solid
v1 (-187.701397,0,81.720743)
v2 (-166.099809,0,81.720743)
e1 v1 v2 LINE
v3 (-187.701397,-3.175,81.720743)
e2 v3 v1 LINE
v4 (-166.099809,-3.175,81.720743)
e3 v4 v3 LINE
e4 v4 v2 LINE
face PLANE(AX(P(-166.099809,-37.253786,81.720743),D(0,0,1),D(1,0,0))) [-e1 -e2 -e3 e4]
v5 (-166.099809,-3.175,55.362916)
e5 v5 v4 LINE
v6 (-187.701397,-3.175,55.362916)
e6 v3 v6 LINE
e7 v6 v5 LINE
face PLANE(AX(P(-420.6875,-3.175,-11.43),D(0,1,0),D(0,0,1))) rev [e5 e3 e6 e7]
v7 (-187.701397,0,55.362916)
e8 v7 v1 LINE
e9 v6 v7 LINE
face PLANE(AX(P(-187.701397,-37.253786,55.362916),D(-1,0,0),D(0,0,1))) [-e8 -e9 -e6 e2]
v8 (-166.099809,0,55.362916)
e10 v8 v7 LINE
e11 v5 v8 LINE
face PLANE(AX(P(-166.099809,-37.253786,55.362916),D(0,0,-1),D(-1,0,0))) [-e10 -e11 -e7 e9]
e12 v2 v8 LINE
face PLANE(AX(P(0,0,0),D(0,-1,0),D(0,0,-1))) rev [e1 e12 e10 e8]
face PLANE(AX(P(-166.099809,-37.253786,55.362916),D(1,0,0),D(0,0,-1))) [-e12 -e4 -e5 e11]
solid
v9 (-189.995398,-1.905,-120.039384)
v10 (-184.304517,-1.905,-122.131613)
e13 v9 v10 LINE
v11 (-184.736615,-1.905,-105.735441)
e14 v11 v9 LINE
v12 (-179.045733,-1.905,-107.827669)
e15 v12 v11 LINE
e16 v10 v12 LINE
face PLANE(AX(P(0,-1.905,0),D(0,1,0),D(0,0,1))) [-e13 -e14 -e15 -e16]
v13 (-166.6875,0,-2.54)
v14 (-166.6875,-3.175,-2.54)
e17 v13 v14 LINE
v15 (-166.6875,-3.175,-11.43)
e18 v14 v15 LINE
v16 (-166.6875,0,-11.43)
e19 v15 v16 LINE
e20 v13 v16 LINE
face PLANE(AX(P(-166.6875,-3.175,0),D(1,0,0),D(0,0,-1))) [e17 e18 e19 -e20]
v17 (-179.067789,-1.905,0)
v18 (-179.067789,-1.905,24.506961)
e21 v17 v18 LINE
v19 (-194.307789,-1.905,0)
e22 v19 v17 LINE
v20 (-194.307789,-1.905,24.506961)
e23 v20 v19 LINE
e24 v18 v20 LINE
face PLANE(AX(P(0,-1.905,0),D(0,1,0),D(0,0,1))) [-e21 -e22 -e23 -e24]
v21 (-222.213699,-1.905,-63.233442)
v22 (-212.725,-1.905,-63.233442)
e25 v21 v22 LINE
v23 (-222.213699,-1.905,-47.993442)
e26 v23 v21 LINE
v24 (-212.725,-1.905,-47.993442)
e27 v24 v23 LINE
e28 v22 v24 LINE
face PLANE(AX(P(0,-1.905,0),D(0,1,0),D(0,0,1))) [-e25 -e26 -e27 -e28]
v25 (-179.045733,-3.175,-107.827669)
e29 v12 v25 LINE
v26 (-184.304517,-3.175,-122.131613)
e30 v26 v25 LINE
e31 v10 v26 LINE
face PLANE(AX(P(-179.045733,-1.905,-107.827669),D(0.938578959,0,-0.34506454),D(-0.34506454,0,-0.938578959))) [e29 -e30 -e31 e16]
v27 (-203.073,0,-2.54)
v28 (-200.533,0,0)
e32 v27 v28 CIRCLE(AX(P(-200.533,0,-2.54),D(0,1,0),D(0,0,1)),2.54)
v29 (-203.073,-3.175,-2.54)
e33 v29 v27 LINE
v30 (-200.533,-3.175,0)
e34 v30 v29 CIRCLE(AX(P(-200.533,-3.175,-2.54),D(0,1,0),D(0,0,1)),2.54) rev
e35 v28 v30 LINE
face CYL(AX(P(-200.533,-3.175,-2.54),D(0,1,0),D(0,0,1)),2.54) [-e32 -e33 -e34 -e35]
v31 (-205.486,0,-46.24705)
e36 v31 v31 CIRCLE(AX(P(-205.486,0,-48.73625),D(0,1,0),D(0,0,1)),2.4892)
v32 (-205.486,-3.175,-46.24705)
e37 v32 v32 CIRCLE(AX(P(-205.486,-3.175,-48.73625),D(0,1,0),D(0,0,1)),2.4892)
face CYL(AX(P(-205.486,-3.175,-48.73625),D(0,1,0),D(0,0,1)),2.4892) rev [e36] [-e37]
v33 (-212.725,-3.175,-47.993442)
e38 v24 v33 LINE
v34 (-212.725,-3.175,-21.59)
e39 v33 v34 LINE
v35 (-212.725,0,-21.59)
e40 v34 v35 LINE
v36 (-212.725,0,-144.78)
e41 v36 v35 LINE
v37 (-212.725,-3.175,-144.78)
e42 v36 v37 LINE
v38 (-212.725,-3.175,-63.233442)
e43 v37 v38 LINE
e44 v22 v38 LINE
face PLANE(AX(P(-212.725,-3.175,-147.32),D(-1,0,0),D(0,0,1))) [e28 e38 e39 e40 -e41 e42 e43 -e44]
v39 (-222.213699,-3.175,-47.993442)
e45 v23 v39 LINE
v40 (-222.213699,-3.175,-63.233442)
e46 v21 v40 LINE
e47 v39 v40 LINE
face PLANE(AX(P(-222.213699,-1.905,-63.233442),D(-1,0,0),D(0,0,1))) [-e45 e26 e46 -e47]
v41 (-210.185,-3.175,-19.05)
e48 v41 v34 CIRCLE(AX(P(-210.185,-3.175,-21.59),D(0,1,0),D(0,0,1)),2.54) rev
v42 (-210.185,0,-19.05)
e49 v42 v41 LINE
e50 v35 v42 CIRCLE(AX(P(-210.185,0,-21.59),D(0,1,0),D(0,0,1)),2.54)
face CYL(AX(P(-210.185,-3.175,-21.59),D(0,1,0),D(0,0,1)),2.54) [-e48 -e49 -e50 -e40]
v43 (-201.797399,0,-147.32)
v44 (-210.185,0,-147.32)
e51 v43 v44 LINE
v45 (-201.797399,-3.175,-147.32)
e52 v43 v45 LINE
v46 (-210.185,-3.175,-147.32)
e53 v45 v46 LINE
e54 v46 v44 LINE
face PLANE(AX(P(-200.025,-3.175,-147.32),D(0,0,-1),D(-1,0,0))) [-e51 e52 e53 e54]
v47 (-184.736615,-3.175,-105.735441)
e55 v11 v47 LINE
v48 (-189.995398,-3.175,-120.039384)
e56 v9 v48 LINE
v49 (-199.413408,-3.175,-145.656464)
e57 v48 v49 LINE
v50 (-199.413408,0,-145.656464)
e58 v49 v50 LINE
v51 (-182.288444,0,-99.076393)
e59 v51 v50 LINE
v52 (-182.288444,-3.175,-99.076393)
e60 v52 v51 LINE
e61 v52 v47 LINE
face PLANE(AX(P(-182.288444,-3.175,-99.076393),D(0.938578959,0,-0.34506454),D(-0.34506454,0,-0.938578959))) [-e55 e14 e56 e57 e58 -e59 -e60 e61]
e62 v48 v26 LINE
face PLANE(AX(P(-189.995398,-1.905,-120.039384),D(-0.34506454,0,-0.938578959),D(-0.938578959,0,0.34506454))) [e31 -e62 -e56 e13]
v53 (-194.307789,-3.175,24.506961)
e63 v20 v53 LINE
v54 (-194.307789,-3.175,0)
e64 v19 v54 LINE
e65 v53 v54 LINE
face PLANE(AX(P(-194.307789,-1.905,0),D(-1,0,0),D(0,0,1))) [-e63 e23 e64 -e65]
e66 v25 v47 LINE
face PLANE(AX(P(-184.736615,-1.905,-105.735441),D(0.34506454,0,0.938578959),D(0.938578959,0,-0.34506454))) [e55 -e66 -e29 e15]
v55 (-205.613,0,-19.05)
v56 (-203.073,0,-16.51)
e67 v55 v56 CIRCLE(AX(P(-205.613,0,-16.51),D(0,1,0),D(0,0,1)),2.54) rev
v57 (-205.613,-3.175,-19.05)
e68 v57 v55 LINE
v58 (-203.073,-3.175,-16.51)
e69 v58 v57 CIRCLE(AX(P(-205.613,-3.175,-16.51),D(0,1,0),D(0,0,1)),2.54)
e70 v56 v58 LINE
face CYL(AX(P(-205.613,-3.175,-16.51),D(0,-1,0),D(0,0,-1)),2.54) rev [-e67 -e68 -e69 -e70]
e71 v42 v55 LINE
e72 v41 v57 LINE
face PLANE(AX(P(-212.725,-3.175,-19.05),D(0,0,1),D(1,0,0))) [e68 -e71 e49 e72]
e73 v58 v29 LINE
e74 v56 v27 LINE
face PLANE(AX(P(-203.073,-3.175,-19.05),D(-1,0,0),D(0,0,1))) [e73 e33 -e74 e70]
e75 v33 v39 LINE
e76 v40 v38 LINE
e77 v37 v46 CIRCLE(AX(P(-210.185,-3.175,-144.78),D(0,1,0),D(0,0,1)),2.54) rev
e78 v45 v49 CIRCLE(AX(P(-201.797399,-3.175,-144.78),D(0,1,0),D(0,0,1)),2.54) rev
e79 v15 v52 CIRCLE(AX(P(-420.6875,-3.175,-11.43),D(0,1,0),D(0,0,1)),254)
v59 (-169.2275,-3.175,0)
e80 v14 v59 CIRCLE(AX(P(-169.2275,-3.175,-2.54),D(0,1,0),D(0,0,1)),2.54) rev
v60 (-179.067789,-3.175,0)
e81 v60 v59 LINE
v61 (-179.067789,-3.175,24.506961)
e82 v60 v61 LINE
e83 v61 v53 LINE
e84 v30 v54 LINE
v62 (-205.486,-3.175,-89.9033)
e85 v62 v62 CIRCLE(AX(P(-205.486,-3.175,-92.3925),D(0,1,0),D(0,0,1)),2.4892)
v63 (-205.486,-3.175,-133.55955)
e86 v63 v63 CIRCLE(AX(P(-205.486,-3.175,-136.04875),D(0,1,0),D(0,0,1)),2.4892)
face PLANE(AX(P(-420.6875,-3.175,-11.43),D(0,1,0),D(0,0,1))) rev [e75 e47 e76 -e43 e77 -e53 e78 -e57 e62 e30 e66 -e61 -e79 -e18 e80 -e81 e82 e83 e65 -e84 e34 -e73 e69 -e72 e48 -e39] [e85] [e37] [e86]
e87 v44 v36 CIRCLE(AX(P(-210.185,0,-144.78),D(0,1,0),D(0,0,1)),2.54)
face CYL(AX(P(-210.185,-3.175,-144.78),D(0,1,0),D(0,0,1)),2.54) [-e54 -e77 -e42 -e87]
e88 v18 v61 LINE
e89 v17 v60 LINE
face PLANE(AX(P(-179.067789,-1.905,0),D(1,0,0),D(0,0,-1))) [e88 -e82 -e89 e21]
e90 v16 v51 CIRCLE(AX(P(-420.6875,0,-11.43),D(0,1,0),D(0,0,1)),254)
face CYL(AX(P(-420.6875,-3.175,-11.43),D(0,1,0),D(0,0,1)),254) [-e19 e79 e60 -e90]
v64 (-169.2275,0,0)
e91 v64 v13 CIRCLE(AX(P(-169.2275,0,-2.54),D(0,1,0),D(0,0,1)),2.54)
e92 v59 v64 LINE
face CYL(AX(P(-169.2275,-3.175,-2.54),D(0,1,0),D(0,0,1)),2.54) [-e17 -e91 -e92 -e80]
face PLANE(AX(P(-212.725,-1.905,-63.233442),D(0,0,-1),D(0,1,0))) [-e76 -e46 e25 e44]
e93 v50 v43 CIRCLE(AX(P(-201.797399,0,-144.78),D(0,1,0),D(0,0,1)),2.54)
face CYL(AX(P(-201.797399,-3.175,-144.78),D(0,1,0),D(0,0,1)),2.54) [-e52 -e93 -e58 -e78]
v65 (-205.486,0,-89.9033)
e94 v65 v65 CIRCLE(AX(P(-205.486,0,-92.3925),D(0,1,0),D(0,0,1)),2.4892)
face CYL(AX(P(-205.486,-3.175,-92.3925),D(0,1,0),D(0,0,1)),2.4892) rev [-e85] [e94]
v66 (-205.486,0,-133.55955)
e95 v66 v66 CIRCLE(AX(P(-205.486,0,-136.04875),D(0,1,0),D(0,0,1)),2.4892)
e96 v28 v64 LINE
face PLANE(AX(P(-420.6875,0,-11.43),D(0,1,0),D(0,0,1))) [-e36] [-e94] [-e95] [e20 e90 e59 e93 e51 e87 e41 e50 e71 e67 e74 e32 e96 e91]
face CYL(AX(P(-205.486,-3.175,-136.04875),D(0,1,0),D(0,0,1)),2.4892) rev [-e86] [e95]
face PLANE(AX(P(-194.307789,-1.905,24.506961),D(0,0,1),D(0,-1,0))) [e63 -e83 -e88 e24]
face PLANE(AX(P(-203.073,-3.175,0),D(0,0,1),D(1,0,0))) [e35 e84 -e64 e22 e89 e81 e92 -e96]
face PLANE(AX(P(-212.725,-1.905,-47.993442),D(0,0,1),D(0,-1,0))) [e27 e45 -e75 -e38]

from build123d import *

# Parameters (mm, degrees)
BASE_FLANGE1_DEPTH  = 3.175
FILLET1_R           = 2.54
SKETCH9_R           = 2.4892
CUT_EXTRUDE1_DEPTH  = 259.776329385
SKETCH10_W          = 21.601588443
SKETCH10_H          = 26.357827305
BOSS_EXTRUDE1_DEPTH = 3.175
SKETCH11_W          = 15.24
SKETCH11_H          = 24.506960717
SKETCH11_W_2        = 9.488699203
SKETCH11_H_2        = 15.24
BOSS_EXTRUDE2_DEPTH = 1.27


# Sheet-metal steps are written as plain solids
with BuildPart() as part:
    # Sketch1 → Base-Flange1 (new body)
    with BuildSketch(Plane(origin=(0, 0, 0), x_dir=(1, 0, 0), z_dir=(0, 1, 0))):
        with BuildLine():
            Line((-203.073, 0), (-166.6875, 0))
            Line((-166.6875, 0), (-166.6875, 11.43))
            ThreePointArc((-166.6875, 11.43), (-170.61814947, 55.942020012), (-182.288444296, 99.07639319))
            Line((-182.288444296, 99.07639319), (-200.025, 147.32))
            Line((-200.025, 147.32), (-212.725, 147.32))
            Line((-212.725, 147.32), (-212.725, 19.05))
            Line((-212.725, 19.05), (-203.073, 19.05))
            Line((-203.073, 19.05), (-203.073, 0))
        make_face()
    extrude(amount=-BASE_FLANGE1_DEPTH)

    # Fillet1
    fillet1_edges = [part.edges().sort_by_distance(p)[0] for p in [
        (-166.6875, -1.5875, 0),
        (-203.073, -1.5875, 0),
        (-203.073, -1.5875, -19.05),
        (-212.725, -1.5875, -19.05),
        (-212.725, -1.5875, -147.32),
        (-200.025, -1.5875, -147.32),
    ]]
    fillet(fillet1_edges, radius=FILLET1_R)

    # Sketch9 → Cut-Extrude1 (cut, through all)
    with BuildSketch(Plane(origin=(0, 0, 0), x_dir=(1, 0, 0), z_dir=(0, 1, 0))):
        with Locations(Location((-205.486, 48.73625, 0), (0, 0, 270))):
            Circle(SKETCH9_R)
        with Locations(Location((-205.486, 92.3925, 0), (0, 0, 270))):
            Circle(SKETCH9_R)
        with Locations(Location((-205.486, 136.04875, 0), (0, 0, 270))):
            Circle(SKETCH9_R)
    extrude(amount=-CUT_EXTRUDE1_DEPTH, mode=Mode.SUBTRACT)

    # Sketch11 → Boss-Extrude2 (add)
    with BuildSketch(Plane.XZ.offset(3.175)):
        with Locations((-186.687788789, 12.253480359)):
            Rectangle(SKETCH11_W, SKETCH11_H)
        with Locations((-217.469349602, -55.613441741)):
            Rectangle(SKETCH11_W_2, SKETCH11_H_2)
        Polygon((-184.736614771, -105.73544108), (-189.995398363, -120.039384422), (-184.304516727, -122.131612715), (-179.045733136, -107.827669373), align=None)
    extrude(amount=-BOSS_EXTRUDE2_DEPTH)


with BuildPart() as body_2:
    # Sketch10 → Boss-Extrude1 (new body)
    with BuildSketch(Plane(origin=(0, 0, 0), x_dir=(1, 0, 0), z_dir=(0, 1, 0))):
        with Locations((-176.900603012, -68.541829584)):
            Rectangle(SKETCH10_W, SKETCH10_H)
    extrude(amount=-BOSS_EXTRUDE1_DEPTH)


solid = Compound([part.part, body_2.part])
